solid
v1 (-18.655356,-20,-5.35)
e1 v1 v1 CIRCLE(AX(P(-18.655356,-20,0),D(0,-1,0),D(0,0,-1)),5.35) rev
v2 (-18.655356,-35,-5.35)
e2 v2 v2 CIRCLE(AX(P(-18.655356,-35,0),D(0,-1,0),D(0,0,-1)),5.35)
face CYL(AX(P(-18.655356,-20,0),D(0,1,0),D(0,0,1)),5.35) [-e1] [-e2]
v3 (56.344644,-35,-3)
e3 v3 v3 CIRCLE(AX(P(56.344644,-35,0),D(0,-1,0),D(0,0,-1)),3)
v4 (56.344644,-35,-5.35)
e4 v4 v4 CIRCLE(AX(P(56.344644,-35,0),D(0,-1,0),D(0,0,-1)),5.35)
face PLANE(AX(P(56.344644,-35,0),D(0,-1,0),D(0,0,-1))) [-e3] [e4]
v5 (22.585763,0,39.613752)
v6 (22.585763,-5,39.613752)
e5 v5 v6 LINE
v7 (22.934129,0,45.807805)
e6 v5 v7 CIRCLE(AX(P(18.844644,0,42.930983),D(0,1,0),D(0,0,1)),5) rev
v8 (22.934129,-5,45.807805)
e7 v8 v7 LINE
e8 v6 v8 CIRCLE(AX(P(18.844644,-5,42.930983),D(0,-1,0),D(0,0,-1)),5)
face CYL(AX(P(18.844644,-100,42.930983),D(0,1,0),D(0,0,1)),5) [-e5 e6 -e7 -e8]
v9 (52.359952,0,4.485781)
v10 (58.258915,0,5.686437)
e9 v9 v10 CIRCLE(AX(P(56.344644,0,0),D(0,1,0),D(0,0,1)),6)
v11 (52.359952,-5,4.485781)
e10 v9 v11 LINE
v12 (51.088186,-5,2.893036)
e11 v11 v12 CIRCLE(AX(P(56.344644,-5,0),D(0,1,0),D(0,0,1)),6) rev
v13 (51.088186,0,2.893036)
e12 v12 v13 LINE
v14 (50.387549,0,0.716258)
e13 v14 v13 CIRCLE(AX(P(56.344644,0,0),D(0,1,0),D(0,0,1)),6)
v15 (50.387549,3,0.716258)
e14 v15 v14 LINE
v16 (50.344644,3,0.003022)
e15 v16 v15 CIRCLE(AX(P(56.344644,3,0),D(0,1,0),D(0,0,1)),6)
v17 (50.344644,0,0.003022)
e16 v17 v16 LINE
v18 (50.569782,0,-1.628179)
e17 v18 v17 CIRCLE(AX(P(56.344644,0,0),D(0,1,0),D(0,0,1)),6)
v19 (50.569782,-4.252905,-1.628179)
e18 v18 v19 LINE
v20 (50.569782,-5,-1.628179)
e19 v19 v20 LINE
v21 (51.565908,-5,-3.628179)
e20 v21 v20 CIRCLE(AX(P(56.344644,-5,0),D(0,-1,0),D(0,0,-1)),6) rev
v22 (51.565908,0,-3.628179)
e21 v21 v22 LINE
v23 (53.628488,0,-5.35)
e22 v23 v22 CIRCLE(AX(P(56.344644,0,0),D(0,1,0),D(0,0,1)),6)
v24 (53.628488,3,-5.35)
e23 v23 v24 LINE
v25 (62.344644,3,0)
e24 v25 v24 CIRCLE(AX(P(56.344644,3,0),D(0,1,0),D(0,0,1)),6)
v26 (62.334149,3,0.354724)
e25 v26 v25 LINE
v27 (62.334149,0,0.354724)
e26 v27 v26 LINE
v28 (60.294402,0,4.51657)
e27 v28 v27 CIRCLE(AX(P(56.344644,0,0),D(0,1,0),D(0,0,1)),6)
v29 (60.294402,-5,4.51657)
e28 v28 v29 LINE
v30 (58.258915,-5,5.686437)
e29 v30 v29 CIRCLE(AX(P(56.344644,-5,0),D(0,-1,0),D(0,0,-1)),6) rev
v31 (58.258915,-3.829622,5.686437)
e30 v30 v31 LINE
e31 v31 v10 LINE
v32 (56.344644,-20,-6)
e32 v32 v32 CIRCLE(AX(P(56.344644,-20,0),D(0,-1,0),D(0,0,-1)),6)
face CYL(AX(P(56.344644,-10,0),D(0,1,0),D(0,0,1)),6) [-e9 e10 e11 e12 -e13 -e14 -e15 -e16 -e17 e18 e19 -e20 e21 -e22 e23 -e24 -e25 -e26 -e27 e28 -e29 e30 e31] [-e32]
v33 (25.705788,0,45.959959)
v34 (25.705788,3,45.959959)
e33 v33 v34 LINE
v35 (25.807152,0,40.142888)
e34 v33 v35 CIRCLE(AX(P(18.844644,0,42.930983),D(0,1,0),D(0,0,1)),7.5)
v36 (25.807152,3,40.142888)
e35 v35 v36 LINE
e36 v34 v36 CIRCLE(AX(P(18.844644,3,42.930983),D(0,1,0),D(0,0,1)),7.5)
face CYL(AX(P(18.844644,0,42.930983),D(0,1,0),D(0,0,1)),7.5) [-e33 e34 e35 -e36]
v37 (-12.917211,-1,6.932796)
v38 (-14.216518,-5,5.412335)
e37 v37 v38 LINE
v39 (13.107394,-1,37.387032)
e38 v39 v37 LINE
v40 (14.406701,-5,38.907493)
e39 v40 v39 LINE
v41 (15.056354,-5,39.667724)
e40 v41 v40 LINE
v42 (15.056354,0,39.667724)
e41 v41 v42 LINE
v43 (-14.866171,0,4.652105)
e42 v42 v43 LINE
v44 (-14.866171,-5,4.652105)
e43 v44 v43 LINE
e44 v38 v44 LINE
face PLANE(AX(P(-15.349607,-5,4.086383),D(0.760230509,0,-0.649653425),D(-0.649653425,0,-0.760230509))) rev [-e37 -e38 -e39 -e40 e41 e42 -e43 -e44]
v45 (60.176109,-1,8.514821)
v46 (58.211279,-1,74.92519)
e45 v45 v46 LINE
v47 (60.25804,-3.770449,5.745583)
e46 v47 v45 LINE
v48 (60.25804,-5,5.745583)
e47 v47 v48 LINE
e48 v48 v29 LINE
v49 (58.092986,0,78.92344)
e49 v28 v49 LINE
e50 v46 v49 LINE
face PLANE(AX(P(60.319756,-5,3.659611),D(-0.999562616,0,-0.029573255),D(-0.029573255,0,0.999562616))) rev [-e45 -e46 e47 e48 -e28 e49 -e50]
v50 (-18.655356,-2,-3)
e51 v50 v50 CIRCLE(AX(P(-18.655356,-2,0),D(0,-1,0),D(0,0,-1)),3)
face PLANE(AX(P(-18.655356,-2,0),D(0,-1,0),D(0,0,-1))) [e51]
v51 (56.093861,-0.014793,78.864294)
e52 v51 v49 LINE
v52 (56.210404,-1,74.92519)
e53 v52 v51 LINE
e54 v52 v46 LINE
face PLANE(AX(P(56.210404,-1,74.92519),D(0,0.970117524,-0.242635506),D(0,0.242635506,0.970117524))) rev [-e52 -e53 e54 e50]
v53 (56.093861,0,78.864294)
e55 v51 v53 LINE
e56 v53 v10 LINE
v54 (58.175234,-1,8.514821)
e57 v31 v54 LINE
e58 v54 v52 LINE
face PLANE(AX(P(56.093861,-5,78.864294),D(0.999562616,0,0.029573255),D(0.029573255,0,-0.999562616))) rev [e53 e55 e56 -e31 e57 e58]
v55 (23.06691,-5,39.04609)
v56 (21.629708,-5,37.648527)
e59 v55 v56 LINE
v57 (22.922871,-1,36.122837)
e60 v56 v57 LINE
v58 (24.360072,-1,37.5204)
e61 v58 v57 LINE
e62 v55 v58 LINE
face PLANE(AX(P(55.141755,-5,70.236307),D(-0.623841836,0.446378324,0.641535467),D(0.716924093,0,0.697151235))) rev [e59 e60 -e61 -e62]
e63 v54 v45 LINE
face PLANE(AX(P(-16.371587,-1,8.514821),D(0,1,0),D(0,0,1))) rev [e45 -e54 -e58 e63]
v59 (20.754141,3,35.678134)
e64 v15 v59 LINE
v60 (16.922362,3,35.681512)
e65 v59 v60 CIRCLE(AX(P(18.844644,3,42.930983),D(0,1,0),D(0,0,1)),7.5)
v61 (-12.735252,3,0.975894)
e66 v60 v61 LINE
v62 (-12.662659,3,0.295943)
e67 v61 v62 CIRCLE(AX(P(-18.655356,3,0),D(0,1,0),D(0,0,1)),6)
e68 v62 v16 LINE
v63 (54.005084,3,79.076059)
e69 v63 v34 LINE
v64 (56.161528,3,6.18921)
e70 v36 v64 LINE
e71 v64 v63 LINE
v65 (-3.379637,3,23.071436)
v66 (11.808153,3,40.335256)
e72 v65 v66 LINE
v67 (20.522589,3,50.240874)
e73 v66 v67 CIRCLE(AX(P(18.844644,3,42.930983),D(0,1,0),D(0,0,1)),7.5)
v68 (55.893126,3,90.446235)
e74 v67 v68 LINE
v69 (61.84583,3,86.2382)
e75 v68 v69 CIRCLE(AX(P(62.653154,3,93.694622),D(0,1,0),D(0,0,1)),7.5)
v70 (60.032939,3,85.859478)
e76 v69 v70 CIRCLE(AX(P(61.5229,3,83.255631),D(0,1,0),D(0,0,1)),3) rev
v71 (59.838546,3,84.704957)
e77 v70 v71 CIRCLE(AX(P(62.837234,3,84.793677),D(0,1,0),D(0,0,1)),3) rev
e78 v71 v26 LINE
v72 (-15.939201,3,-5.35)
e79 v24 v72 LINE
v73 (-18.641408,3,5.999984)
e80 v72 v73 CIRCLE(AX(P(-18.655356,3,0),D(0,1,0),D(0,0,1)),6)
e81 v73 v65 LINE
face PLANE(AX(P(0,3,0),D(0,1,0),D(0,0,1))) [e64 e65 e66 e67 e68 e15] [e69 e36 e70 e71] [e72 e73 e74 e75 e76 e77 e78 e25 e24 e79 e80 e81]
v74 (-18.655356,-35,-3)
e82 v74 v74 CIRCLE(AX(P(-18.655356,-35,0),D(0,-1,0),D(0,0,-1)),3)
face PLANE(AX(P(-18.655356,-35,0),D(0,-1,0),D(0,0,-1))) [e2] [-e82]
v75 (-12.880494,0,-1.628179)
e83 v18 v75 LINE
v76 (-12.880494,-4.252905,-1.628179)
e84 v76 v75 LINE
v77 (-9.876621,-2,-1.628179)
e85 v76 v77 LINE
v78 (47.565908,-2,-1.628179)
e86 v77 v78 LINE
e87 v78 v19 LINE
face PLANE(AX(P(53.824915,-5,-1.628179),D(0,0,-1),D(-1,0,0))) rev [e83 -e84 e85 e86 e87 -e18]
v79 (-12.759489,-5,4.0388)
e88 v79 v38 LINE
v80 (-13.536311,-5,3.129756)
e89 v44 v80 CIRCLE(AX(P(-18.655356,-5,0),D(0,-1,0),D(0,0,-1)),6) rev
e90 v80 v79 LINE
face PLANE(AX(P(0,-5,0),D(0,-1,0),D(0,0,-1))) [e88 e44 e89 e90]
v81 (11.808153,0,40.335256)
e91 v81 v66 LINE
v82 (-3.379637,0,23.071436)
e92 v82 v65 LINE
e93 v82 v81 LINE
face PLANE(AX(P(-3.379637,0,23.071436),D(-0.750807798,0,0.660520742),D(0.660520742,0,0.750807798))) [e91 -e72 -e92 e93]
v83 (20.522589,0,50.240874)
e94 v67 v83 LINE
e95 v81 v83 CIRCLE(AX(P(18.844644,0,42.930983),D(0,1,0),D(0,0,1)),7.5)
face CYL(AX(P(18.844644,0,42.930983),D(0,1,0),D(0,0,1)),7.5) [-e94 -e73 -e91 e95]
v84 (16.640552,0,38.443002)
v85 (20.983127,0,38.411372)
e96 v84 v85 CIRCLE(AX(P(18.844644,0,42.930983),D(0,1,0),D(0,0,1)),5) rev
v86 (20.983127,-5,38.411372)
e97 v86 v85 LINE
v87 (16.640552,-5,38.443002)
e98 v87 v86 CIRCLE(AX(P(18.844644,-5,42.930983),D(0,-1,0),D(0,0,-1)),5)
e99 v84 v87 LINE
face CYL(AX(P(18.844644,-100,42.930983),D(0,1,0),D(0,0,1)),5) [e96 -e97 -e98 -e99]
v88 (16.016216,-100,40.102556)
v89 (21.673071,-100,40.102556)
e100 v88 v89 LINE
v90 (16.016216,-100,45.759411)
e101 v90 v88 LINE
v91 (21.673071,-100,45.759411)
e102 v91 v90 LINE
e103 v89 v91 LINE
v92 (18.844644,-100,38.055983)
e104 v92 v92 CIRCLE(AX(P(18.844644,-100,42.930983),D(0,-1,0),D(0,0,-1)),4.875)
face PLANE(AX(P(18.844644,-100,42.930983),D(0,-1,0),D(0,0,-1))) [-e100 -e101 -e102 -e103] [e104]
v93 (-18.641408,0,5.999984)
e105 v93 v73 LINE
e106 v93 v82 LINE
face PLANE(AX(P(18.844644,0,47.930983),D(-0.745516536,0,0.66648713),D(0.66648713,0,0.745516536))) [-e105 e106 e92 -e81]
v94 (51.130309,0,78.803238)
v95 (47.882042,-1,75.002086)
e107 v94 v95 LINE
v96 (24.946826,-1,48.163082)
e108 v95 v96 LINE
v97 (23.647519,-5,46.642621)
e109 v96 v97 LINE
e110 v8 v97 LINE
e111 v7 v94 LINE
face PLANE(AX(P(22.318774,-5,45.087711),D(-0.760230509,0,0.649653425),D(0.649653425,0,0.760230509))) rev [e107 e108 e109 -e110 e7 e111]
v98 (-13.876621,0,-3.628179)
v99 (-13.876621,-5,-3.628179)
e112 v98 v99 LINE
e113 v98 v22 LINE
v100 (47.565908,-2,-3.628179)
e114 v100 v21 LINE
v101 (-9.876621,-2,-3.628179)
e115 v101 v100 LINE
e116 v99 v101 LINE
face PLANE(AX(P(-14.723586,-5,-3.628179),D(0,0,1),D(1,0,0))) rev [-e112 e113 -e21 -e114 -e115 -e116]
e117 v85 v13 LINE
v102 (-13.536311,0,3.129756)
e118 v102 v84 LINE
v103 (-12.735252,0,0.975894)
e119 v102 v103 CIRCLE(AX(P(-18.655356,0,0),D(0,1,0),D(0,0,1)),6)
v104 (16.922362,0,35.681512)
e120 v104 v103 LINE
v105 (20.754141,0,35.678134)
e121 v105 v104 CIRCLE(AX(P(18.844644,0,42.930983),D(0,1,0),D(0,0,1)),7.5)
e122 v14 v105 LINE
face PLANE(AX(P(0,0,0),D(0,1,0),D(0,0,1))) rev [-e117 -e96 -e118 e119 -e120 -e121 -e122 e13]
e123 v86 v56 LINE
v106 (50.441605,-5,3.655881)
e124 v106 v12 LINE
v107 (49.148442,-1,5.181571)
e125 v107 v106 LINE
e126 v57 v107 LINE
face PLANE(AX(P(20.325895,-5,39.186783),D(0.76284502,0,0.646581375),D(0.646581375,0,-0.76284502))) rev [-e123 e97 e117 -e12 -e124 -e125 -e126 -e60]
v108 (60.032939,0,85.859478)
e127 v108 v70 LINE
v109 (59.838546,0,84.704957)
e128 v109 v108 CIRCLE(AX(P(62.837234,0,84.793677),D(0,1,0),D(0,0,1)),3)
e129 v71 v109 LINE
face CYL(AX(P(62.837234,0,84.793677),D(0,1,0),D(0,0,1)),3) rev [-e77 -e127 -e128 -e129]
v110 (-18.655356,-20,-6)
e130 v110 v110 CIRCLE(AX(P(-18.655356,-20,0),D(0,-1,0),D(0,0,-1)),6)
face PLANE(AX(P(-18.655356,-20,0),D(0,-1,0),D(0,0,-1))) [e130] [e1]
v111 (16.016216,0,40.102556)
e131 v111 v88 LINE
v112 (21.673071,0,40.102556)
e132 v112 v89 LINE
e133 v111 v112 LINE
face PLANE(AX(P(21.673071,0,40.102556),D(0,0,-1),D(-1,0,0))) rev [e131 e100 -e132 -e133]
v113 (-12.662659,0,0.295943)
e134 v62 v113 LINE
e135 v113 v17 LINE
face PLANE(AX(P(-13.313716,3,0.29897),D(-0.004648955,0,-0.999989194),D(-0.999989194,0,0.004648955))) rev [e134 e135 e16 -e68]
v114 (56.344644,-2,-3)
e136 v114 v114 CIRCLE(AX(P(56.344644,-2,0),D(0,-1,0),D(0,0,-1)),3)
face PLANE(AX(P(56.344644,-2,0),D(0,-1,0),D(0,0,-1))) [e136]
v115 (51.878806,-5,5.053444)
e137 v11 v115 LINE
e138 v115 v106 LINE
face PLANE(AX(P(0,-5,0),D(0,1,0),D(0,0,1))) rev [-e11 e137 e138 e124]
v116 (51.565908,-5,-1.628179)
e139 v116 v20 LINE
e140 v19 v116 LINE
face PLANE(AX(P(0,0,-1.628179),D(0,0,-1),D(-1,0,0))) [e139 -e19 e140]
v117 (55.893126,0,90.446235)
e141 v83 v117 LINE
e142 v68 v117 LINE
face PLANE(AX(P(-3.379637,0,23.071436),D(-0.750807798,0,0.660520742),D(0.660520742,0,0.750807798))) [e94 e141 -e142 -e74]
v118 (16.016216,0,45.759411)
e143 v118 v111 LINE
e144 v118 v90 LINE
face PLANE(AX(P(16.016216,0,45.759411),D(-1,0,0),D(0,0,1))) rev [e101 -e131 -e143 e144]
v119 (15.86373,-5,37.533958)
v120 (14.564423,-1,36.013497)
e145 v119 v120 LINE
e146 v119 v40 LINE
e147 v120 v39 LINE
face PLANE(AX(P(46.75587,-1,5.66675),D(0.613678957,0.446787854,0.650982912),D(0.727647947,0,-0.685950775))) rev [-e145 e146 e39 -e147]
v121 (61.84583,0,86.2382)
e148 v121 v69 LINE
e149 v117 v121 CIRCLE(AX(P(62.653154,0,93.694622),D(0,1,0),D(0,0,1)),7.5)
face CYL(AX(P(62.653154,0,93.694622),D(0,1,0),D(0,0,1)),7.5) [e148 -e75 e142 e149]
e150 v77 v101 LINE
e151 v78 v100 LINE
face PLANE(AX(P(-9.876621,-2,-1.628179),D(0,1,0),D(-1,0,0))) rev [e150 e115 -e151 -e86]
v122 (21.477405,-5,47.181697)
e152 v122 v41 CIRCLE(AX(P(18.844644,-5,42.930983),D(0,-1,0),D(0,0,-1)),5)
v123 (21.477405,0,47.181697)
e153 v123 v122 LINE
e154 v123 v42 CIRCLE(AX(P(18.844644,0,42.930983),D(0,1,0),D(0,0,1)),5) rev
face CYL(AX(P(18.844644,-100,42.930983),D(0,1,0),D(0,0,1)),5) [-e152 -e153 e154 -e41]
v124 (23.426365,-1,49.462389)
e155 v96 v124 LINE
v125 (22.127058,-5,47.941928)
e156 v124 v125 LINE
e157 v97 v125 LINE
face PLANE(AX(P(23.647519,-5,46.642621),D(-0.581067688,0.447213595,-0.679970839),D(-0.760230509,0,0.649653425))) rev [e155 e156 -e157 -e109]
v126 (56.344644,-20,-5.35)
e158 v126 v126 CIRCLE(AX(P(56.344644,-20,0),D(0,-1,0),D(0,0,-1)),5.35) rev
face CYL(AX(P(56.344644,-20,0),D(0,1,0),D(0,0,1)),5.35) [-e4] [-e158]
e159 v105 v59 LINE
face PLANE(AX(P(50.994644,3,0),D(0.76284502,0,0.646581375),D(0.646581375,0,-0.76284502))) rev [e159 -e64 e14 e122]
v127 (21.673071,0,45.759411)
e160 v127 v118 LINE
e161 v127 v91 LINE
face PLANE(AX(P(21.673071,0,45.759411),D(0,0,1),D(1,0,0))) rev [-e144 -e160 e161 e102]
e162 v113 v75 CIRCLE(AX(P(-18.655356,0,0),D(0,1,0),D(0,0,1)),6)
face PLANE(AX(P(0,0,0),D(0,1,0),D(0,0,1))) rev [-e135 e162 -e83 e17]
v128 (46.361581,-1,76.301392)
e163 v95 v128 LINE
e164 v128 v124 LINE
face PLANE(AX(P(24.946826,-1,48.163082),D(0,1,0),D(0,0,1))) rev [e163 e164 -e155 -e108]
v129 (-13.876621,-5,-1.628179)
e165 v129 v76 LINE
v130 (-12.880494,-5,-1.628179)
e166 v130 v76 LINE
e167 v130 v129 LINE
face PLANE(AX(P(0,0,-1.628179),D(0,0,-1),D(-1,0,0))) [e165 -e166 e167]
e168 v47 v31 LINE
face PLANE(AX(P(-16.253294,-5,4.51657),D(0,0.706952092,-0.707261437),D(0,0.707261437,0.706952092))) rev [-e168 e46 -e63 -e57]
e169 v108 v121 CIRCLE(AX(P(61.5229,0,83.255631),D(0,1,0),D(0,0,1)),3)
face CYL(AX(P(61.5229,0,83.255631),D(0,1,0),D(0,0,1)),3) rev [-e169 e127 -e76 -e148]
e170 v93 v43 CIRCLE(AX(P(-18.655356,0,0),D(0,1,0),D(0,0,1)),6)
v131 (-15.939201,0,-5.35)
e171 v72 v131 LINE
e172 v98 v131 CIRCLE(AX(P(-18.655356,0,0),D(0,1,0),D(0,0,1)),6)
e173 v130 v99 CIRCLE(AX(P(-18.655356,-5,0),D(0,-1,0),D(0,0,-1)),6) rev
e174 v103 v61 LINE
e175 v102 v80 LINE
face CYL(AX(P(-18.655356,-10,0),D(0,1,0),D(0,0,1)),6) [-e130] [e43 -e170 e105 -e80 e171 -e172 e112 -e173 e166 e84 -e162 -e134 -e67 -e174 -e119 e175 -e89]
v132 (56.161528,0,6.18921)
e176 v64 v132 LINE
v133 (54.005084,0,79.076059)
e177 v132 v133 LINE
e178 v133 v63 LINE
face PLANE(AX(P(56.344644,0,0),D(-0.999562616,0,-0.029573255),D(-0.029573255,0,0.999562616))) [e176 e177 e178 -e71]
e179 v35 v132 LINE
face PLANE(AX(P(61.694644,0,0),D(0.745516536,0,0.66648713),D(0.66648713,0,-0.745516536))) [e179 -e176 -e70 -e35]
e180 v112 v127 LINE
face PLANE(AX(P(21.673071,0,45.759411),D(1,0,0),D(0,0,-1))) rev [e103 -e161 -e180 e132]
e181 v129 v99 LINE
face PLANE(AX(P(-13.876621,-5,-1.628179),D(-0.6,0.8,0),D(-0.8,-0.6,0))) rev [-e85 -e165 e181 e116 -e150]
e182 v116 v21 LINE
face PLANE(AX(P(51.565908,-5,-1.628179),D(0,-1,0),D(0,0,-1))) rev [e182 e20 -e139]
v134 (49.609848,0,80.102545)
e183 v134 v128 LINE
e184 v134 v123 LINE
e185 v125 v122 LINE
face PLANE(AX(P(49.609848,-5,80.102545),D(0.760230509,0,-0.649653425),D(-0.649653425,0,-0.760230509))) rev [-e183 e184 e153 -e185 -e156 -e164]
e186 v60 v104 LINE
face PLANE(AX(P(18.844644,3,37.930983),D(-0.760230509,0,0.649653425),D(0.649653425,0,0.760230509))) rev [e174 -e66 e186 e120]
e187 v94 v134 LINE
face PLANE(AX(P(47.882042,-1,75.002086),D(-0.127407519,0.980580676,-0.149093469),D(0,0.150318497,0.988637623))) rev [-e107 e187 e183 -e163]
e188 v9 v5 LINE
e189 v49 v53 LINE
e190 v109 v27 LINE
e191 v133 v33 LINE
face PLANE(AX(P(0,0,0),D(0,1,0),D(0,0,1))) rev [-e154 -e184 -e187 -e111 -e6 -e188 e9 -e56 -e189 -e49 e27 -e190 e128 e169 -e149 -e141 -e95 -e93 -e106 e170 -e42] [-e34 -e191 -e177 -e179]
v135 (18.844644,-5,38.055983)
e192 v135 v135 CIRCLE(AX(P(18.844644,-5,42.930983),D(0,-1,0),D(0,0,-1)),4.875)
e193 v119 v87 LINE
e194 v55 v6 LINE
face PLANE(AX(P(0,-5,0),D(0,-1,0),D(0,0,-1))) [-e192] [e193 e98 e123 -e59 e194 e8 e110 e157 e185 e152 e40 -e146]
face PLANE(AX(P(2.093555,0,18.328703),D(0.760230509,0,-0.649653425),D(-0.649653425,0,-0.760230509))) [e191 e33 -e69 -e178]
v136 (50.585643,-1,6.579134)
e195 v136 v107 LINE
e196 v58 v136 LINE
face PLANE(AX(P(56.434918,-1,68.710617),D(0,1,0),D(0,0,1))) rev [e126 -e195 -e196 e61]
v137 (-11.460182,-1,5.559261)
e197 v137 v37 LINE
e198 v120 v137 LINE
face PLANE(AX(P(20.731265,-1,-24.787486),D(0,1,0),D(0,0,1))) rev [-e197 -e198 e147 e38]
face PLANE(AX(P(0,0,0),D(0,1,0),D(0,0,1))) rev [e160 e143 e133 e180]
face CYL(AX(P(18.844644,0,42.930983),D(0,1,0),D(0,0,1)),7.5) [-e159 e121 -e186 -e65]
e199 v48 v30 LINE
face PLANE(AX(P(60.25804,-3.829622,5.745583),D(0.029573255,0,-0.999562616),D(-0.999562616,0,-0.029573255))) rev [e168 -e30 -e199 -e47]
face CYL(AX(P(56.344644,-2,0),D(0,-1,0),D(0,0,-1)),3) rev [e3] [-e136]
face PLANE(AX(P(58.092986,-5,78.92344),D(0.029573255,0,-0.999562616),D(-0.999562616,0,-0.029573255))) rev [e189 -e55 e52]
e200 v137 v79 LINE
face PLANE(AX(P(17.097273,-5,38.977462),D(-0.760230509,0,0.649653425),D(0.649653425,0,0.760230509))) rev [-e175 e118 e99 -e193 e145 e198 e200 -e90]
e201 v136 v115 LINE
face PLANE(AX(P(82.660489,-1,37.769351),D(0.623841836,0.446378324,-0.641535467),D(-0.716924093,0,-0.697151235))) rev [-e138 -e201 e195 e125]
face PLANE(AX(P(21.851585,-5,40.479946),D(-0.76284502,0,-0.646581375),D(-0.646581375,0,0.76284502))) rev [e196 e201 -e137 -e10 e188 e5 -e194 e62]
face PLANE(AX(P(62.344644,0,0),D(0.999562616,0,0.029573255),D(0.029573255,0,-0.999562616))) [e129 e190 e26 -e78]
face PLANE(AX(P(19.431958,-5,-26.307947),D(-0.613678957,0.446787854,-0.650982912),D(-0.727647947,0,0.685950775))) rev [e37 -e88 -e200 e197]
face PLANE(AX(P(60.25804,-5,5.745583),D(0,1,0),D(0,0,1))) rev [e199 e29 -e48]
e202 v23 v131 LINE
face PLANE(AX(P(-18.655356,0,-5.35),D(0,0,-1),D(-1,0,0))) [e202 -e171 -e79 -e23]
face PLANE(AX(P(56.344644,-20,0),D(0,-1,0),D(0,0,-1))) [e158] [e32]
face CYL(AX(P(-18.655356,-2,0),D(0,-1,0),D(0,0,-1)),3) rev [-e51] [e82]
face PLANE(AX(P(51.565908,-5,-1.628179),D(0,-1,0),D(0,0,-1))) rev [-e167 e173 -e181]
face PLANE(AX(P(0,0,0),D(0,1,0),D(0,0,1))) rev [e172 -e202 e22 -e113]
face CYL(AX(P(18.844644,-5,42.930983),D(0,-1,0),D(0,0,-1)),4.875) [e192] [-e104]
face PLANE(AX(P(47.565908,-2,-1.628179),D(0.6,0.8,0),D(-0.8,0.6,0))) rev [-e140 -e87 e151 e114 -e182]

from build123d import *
from build123d.topology import SkipClean

# Parameters (mm, degrees)
EXTRUDE_1_DEPTH     = 3
SKETCH_2_R          = 5.35
EXTRUDE_2_DEPTH     = 23
CUT_EXTRUDE_1_DEPTH = 3
SKETCH_4_R          = 5
EXTRUDE_3_DEPTH     = 100
EXTRUDE_START       = 3
SKETCH_5_R          = 5
EXTRUDE_4_DEPTH     = 3
SKETCH_6_R          = 5.35
EXTRUDE_5_DEPTH     = 5
SKETCH_7_R          = 5.35
EXTRUDE_6_DEPTH     = 5
SKETCH_8_W          = 75
SKETCH_8_H          = 10.7
EXTRUDE_7_DEPTH     = 3
EXTRUDE_8_DEPTH     = 3
CUT_EXTRUDE_2_DEPTH = 3
SKETCH_12_R         = 6
EXTRUDE_10_DEPTH    = 13
SKETCH_13_R         = 3
CUT_EXTRUDE_3_DEPTH = 23
SKETCH_14_R         = 3.125
CUT_EXTRUDE_5_DEPTH = 100
SKETCH_15_R         = 6
SKETCH_15_R_2       = 5.35
EXTRUDE_11_DEPTH    = 5
SKETCH_16_R         = 6
SKETCH_16_R_2       = 3
EXTRUDE_12_DEPTH    = 5
SKETCH_17_R         = 5.35
SKETCH_17_R_2       = 3
EXTRUDE_13_DEPTH    = 5
SKETCH_18_R         = 5.35
SKETCH_18_R_2       = 3
EXTRUDE_14_DEPTH    = 5
SKETCH_20_R         = 6
SKETCH_20_R_2       = 5.35
EXTRUDE_15_DEPTH    = 5
SKETCH_21_R         = 6
SKETCH_21_R_2       = 5.35
EXTRUDE_16_DEPTH    = 5
SKETCH_22_R         = 5.35
SKETCH_22_R_2       = 3
EXTRUDE_17_DEPTH    = 5
SKETCH_23_R         = 5.35
SKETCH_23_R_2       = 3
EXTRUDE_18_DEPTH    = 5
SKETCH_25_R         = 7.5
EXTRUDE_20_DEPTH    = 3
EXTRUDE_21_DEPTH    = 3
EXTRUDE_23_DEPTH    = 3
SKETCH_30_R         = 7.5
EXTRUDE_24_DEPTH    = 3
FILLET_1_R          = 3
EXTRUDE_29_DEPTH    = 5
EXTRUDE_31_DEPTH    = 2
SKETCH_50_R         = 5
EXTRUDE_32_DEPTH    = 103
CUT_EXTRUDE_START   = -95
SKETCH_51_R         = 5
SKETCH_51_R_2       = 4.875
CUT_EXTRUDE_6_DEPTH = 95
SKETCH_52_W         = 5.65685425
SKETCH_52_H         = 5.656854249
CUT_EXTRUDE_7_DEPTH = 100


with BuildPart() as part:
    # 草图1 → 凸台-拉伸1 (new body)
    with BuildSketch(Plane(origin=(0, 0, 0), x_dir=(1, 0, 0), z_dir=(0, 1, 0))):
        Polygon((-18.65535641, 0), (18.84464359, -42.930983399), (56.34464359, 0), align=None)
    extrude(amount=EXTRUDE_1_DEPTH)

    # 草图2 → 凸台-拉伸2 (add)
    with BuildSketch(Plane(origin=(0, 3, 0), x_dir=(1, 0, 0), z_dir=(0, 1, 0))):
        with Locations(Location((56.34464359, 0, 0), (0, 0, 270))):
            Circle(SKETCH_2_R)
        with Locations(Location((-18.65535641, 0, 0), (0, 0, 270))):
            Circle(SKETCH_2_R)
    extrude(amount=-EXTRUDE_2_DEPTH)

    # 草图3 → 切除-拉伸1 (cut)
    with BuildSketch(Plane.XZ):
        Polygon((8.632668758, 17.559374543), (1.15609776, 9), (33.75905687, 9), (36.53318942, 9), (29.056618422, 17.559374543), (18.84464359, 29.25031113), align=None)
    extrude(amount=-CUT_EXTRUDE_1_DEPTH, mode=Mode.SUBTRACT)

    # 草图4 → 凸台-拉伸3 (add)
    with BuildSketch(Plane.XZ):
        with Locations(Location((18.84464359, 42.930983399, 0), (0, 0, 228.862949093))):
            Circle(SKETCH_4_R)
    extrude(amount=EXTRUDE_3_DEPTH)

    # 草图5 → 凸台-拉伸4 (add)
    with BuildSketch(Plane(origin=(0, 0, 0), x_dir=(1, 0, 0), z_dir=(0, 1, 0)).offset(EXTRUDE_START)):
        with Locations(Location((18.84464359, -42.930983399, 0), (0, 0, 131.137050907))):
            Circle(SKETCH_5_R)
    extrude(amount=-EXTRUDE_4_DEPTH)

    # 草图6 → 凸台-拉伸5 (add)
    with SkipClean():  # the faces are left unmerged after this step: merging them gives an invalid solid
        with BuildSketch(Plane.XZ.offset(20)):
            with Locations(Location((56.34464359, 0, 0), (0, 0, 131.137050907))):
                Circle(SKETCH_6_R)
        extrude(amount=EXTRUDE_5_DEPTH)
    add(part.part.scale(1), mode=Mode.REPLACE)  # the faces are merged on a copy

    # 草图7 → 凸台-拉伸6 (add)
    with BuildSketch(Plane.XZ.offset(20)):
        with Locations(Location((-18.65535641, 0, 0), (0, 0, 48.862949093))):
            Circle(SKETCH_7_R)
    extrude(amount=EXTRUDE_6_DEPTH)

    # 草图8 → 凸台-拉伸7 (add)
    with SkipClean():  # the faces are left unmerged after this step: merging them gives an invalid solid
        with BuildSketch(Plane(origin=(0, 3, 0), x_dir=(1, 0, 0), z_dir=(0, 1, 0))):
            with Locations((18.84464359, 0)):
                Rectangle(SKETCH_8_W, SKETCH_8_H)
        extrude(amount=-EXTRUDE_7_DEPTH)

    # 草图9 → 凸台-拉伸8 (add)
    with SkipClean():  # the faces are left unmerged after this step: merging them gives an invalid solid
        with BuildSketch(Plane(origin=(0, 3, 0), x_dir=(1, 0, 0), z_dir=(0, 1, 0))):
            Polygon((61.69464359, 0), (18.84464359, -47.930983399), (-24.00535641, 0), align=None)
        extrude(amount=-EXTRUDE_8_DEPTH)

    # 草图10 → 切除-拉伸2 (cut)
    with SkipClean():  # the faces are left unmerged after this step: merging them gives an invalid solid
        with BuildSketch(Plane.XZ):
            Polygon((18.84464359, 37.930983399), (-13.313716495, 0.298969924), (50.99464359, 0), align=None)
        extrude(amount=-CUT_EXTRUDE_2_DEPTH, mode=Mode.SUBTRACT)

    # 草图12 → 凸台-拉伸10 (add)
    with SkipClean():  # the faces are left unmerged after this step: merging them gives an invalid solid
        with BuildSketch(Plane(origin=(0, 3, 0), x_dir=(1, 0, 0), z_dir=(0, 1, 0))):
            with Locations(Location((-18.65535641, 0, 0), (0, 0, 270))):
                Circle(SKETCH_12_R)
            with Locations(Location((56.34464359, 0, 0), (0, 0, 270))):
                Circle(SKETCH_12_R)
        extrude(amount=-EXTRUDE_10_DEPTH)

    # 草图13 → 切除-拉伸3 (cut)
    with SkipClean():  # the faces are left unmerged after this step: merging them gives an invalid solid
        with BuildSketch(Plane.XZ.offset(25)):
            with Locations(Location((-18.65535641, 0, 0), (0, 0, 270))):
                Circle(SKETCH_13_R)
            with Locations(Location((56.34464359, 0, 0), (0, 0, 270))):
                Circle(SKETCH_13_R)
        extrude(amount=-CUT_EXTRUDE_3_DEPTH, mode=Mode.SUBTRACT)

    # 草图14 → 切除-拉伸5 (cut)
    with SkipClean():  # the faces are left unmerged after this step: merging them gives an invalid solid
        with BuildSketch(Plane.XZ.offset(100)):
            with Locations(Location((18.84464359, 42.930983399, 0), (0, 0, 270))):
                Circle(SKETCH_14_R)
        extrude(amount=-CUT_EXTRUDE_5_DEPTH, mode=Mode.SUBTRACT)

    # 草图15 → 凸台-拉伸11 (add)
    with SkipClean():  # the faces are left unmerged after this step: merging them gives an invalid solid
        with BuildSketch(Plane.XZ.offset(10)):
            with Locations(Location((56.34464359, 0, 0), (0, 0, 90.133194259))):
                Circle(SKETCH_15_R)
            with Locations(Location((56.34464359, 0, 0), (0, 0, 270))):
                Circle(SKETCH_15_R_2, mode=Mode.SUBTRACT)
        extrude(amount=EXTRUDE_11_DEPTH)

    # 草图16 → 凸台-拉伸12 (add)
    with SkipClean():  # the faces are left unmerged after this step: merging them gives an invalid solid
        with BuildSketch(Plane.XZ.offset(10)):
            with Locations(Location((-18.65535641, 0, 0), (0, 0, 89.866805741))):
                Circle(SKETCH_16_R)
            with Locations(Location((-18.65535641, 0, 0), (0, 0, 270))):
                Circle(SKETCH_16_R_2, mode=Mode.SUBTRACT)
        extrude(amount=EXTRUDE_12_DEPTH)

    # 草图17 → 凸台-拉伸13 (add)
    with SkipClean():  # the faces are left unmerged after this step: merging them gives an invalid solid
        with BuildSketch(Plane.XZ.offset(25)):
            with Locations(Location((-18.65535641, 0, 0), (0, 0, 270))):
                Circle(SKETCH_17_R)
            with Locations(Location((-18.65535641, 0, 0), (0, 0, 270))):
                Circle(SKETCH_17_R_2, mode=Mode.SUBTRACT)
        extrude(amount=EXTRUDE_13_DEPTH)

    # 草图18 → 凸台-拉伸14 (add)
    with SkipClean():  # the faces are left unmerged after this step: merging them gives an invalid solid
        with BuildSketch(Plane.XZ.offset(25)):
            with Locations(Location((56.34464359, 0, 0), (0, 0, 270))):
                Circle(SKETCH_18_R)
            with Locations(Location((56.34464359, 0, 0), (0, 0, 270))):
                Circle(SKETCH_18_R_2, mode=Mode.SUBTRACT)
        extrude(amount=EXTRUDE_14_DEPTH)

    # 草图20 → 凸台-拉伸15 (add)
    with SkipClean():  # the faces are left unmerged after this step: merging them gives an invalid solid
        with BuildSketch(Plane.XZ.offset(15)):
            with Locations(Location((-18.65535641, 0, 0), (0, 0, 89.866805741))):
                Circle(SKETCH_20_R)
            with Locations(Location((-18.65535641, 0, 0), (0, 0, 270))):
                Circle(SKETCH_20_R_2, mode=Mode.SUBTRACT)
        extrude(amount=EXTRUDE_15_DEPTH)

    # 草图21 → 凸台-拉伸16 (add)
    with SkipClean():  # the faces are left unmerged after this step: merging them gives an invalid solid
        with BuildSketch(Plane.XZ.offset(15)):
            with Locations(Location((56.34464359, 0, 0), (0, 0, 90.133194259))):
                Circle(SKETCH_21_R)
            with Locations(Location((56.34464359, 0, 0), (0, 0, 270))):
                Circle(SKETCH_21_R_2, mode=Mode.SUBTRACT)
        extrude(amount=EXTRUDE_16_DEPTH)

    # 草图22 → 凸台-拉伸17 (add)
    with SkipClean():  # the faces are left unmerged after this step: merging them gives an invalid solid
        with BuildSketch(Plane.XZ.offset(30)):
            with Locations(Location((-18.65535641, 0, 0), (0, 0, 270))):
                Circle(SKETCH_22_R)
            with Locations(Location((-18.65535641, 0, 0), (0, 0, 270))):
                Circle(SKETCH_22_R_2, mode=Mode.SUBTRACT)
        extrude(amount=EXTRUDE_17_DEPTH)

    # 草图23 → 凸台-拉伸18 (add)
    with SkipClean():  # the faces are left unmerged after this step: merging them gives an invalid solid
        with BuildSketch(Plane.XZ.offset(30)):
            with Locations(Location((56.34464359, 0, 0), (0, 0, 270))):
                Circle(SKETCH_23_R)
            with Locations(Location((56.34464359, 0, 0), (0, 0, 270))):
                Circle(SKETCH_23_R_2, mode=Mode.SUBTRACT)
        extrude(amount=EXTRUDE_18_DEPTH)

    # 草图25 → 凸台-拉伸20 (add)
    with SkipClean():  # the faces are left unmerged after this step: merging them gives an invalid solid
        with BuildSketch(Plane(origin=(0, 3, 0), x_dir=(1, 0, 0), z_dir=(0, 1, 0))):
            with Locations((18.84464359, -42.930983399)):
                Circle(SKETCH_25_R)
        extrude(amount=-EXTRUDE_20_DEPTH)

    # 草图28 → 凸台-拉伸21 (add)
    with SkipClean():  # the faces are left unmerged after this step: merging them gives an invalid solid
        with BuildSketch(Plane(origin=(0, 3, 0), x_dir=(1, 0, 0), z_dir=(0, 1, 0))):
            Polygon((-3.379636645, -23.071435978), (2.093554995, -18.328702995), (68.652557408, -96.216669577), (66.868599364, -97.910067347), (64.321605904, -100.026810209), align=None)
        extrude(amount=-EXTRUDE_21_DEPTH)

    # 草图29 → 凸台-拉伸23 (add)
    with SkipClean():  # the faces are left unmerged after this step: merging them gives an invalid solid
        with BuildSketch(Plane(origin=(0, 3, 0), x_dir=(1, 0, 0), z_dir=(0, 1, 0))):
            Polygon((56.34464359, 0), (53.74105837, -88), (59.74105837, -88), (62.34464359, 0), align=None)
        extrude(amount=-EXTRUDE_23_DEPTH)

    # 草图30 → 凸台-拉伸24 (add)
    with SkipClean():  # the faces are left unmerged after this step: merging them gives an invalid solid
        with BuildSketch(Plane(origin=(0, 3, 0), x_dir=(1, 0, 0), z_dir=(0, 1, 0))):
            with Locations((62.6531538, -93.694621783)):
                Circle(SKETCH_30_R)
        extrude(amount=-EXTRUDE_24_DEPTH)

    # 圆角1
    # the kernel refuses this fillet: 3 mm, written as the material it adds along each edge
    with BuildSketch(Plane(origin=(60.387632696, 0, 86.544977448), x_dir=(-0.6496534253779116, 0, -0.760230509052844), z_dir=(0, 1, 0))) as fillet_1_piece_1:
        with BuildLine():
            CenterArc((1.763131122, -3), FILLET_1_R, 90, 55.663998218)
            ThreePointArc((-0.714100998, -1.307864951), (-0.324488751, -0.671711358), (0, 0))
            Line((0, 0), (1.763131122, 0))
        make_face()
    extrude(amount=3)
    with BuildSketch(Plane(origin=(59.804303017, 0, 85.862359607), x_dir=(0.02957325513951661, 0, -0.9995626156376863), z_dir=(0, 1, 0))) as fillet_1_piece_2:
        with BuildLine():
            CenterArc((FILLET_1_R * 0.38596961824, -FILLET_1_R), FILLET_1_R, 90, 42.210146514)
            Line((-FILLET_1_R * 0.285882149698, -FILLET_1_R * 0.259314370385), (0, 0))
            Line((0, 0), (FILLET_1_R * 0.38596961824, 0))
        make_face()
    extrude(amount=3)

    # 草图31 → 凸台-拉伸29 (add)
    with BuildSketch(Plane.XZ):
        Polygon((-14.723586471, -1.628179316), (-14.723586471, -3.628179316), (53.527409972, -3.628179316), (53.82491501, -1.628179316), align=None)
        Polygon((49.609847968, 80.102545011), (51.130308987, 78.80323816), (22.318773999, 45.087710689), (20.798312981, 46.38701754), align=None)
        Polygon((-15.349607435, 4.086383285), (-13.829146417, 2.787076434), (17.097273349, 38.977461836), (15.576812331, 40.276768687), align=None)
        Polygon((20.325894576, 39.186783249), (51.86894969, 1.971881231), (53.394639731, 3.265043982), (21.851584617, 40.479945999), align=None)
        Polygon((56.093860655, 78.864293565), (58.318881117, 3.659610745), (60.319756269, 3.659610745), (58.092985887, 78.923440075), align=None)
    extrude(amount=EXTRUDE_29_DEPTH)

    # 切除-扫描1: sweep along a path in 草图36
    with BuildLine(Plane.XZ.offset(5)) as sweep_1_path:
        Line((18.84464359, -3.628179316), (18.84464359, -1.628179316))
    # 草图35 → 切除-扫描1 (sweep, cut)
    with BuildSketch(Plane(origin=(0, 0, -3.628179316), x_dir=(-1, 0, 0), z_dir=(0, 0, -1))):
        Polygon((13.876620714, -5), (9.876620714, -2), (-47.565907894, -2), (-51.565907894, -5), align=None)
    sweep(path=sweep_1_path.line, mode=Mode.SUBTRACT)

    # 切除-扫描3: sweep along a path in 草图38
    with BuildLine(Plane.XZ.offset(5)) as sweep_3_path:
        Line((59.19369399, 41.720005215), (57.192818839, 41.720005215))
    # 草图37 → 切除-扫描3 (sweep, cut)
    with BuildSketch(Plane(origin=(60.375181238, 0, 1.786271926), x_dir=(0.029573255139513054, 0, -0.9995626156376864), z_dir=(0.9995626156376866, 0, 0.029573255139513057))):
        Polygon((-2.73149314, -5), (-6.73149314, -1), (-73.170921503, -1), (-77.170921503, -5), align=None)
    sweep(path=sweep_3_path.line, mode=Mode.SUBTRACT)

    # 草图39 → 凸台-拉伸31 (add)
    with BuildSketch(Plane(origin=(58.376056006, 0, 1.727125416), x_dir=(0.02957325513951297, 0, -0.9995626156376864), z_dir=(0.9995626156376866, 0, 0.029573255139512974))):
        Polygon((-3.961044, -3.829621531), (-3.961044, -5), (-2.73149314, -5), (-2.73149314, -4.501704435), (-3.961044, -3.272153575), align=None)
    extrude(amount=EXTRUDE_31_DEPTH)

    # 切除-扫描5: sweep along a path in 草图42
    with BuildLine(Plane.XZ.offset(5)) as sweep_5_path:
        Line((0.095091388, 22.159914171), (1.552120507, 20.786378718))
    # 草图40 → 切除-扫描5 (sweep, cut)
    with BuildSketch(Plane(origin=(-10.889521113, 0, 9.305617977), x_dir=(0.6496534253779145, 0, 0.7602305090528415), z_dir=(-0.7602305090528415, 0, 0.6496534253779145))):
        Polygon((-5.121187346, -5), (-3.121187346, -1), (36.9380259, -1), (38.9380259, -5), align=None)
    sweep(path=sweep_5_path.line, mode=Mode.SUBTRACT)

    # 切除-扫描6: sweep along a path in 草图44
    with BuildLine(Plane.XZ.offset(5)) as sweep_6_path:
        Line((36.035656698, 20.652203895), (37.472857905, 22.049766909))
    # 草图43 → 切除-扫描6 (sweep, cut)
    with BuildSketch(Plane(origin=(31.1568423, 0, 26.408291855), x_dir=(-0.6465813751887421, 0, 0.7628450204720715), z_dir=(-0.7628450204720715, 0, -0.6465813751887421))):
        Polygon((14.734624595, -5), (12.734624595, -1), (-27.825731715, -1), (-29.825731715, -5), align=None)
    sweep(path=sweep_6_path.line, mode=Mode.SUBTRACT)

    # 切除-扫描7: sweep along a path in 草图47
    with BuildLine(Plane.XZ.offset(5)) as sweep_7_path:
        Line((37.03221924, 62.305521799), (35.511758222, 63.60482865))
    # 草图46 → 切除-扫描7 (sweep, cut)
    with BuildSketch(Plane(origin=(-10.889521113, 0, 9.305617977), x_dir=(0.6496534253779142, 0, 0.7602305090528417), z_dir=(-0.7602305090528417, 0, 0.6496534253779142))):
        Polygon((50.821835343, -5), (52.821835343, -1), (88.125606235, -1), (93.125606235, 0), (93.125606235, -5), align=None)
    sweep(path=sweep_7_path.line, mode=Mode.SUBTRACT)

    # 切除-扫描8: sweep along a path in 草图49
    with BuildLine(Plane.XZ.offset(1)) as sweep_8_path:
        Line((58.211278907, 74.925189613), (56.210403756, 74.925189613))
        Line((56.210403756, 74.925189613), (55.379994456, 74.925189613))
    # 草图48 → 切除-扫描8 (sweep, cut)
    with BuildSketch(Plane(origin=(60.375181238, 0, 1.786271926), x_dir=(0.029573255139513054, 0, -0.9995626156376864), z_dir=(0.9995626156376866, 0, 0.029573255139513057))):
        Polygon((-73.170921503, -1), (-77.170921503, 0), (-77.170921503, -5), align=None)
    sweep(path=sweep_8_path.line, mode=Mode.SUBTRACT)

    # 草图50 → 凸台-拉伸32 (add)
    with BuildSketch(Plane(origin=(0, 3, 0), x_dir=(1, 0, 0), z_dir=(0, 1, 0))):
        with Locations(Location((18.84464359, -42.930983399, 0), (0, 0, 301.772799352))):
            Circle(SKETCH_50_R)
    extrude(amount=-EXTRUDE_32_DEPTH)

    # 草图51 → 切除-拉伸6 (cut)
    with BuildSketch(Plane.XZ.offset(100).offset(CUT_EXTRUDE_START)):
        with Locations((18.84464359, 42.930983399)):
            Circle(SKETCH_51_R)
        with Locations(Location((18.84464359, 42.930983399, 0), (0, 0, 270))):
            Circle(SKETCH_51_R_2, mode=Mode.SUBTRACT)
    extrude(amount=CUT_EXTRUDE_6_DEPTH, mode=Mode.SUBTRACT)

    # 草图52 → 切除-拉伸7 (cut)
    with BuildSketch(Plane.XZ.offset(100)):
        with Locations((18.84464359, 42.930983399)):
            Rectangle(SKETCH_52_W, SKETCH_52_H)
    extrude(amount=-CUT_EXTRUDE_7_DEPTH, mode=Mode.SUBTRACT)


solid = part.part
